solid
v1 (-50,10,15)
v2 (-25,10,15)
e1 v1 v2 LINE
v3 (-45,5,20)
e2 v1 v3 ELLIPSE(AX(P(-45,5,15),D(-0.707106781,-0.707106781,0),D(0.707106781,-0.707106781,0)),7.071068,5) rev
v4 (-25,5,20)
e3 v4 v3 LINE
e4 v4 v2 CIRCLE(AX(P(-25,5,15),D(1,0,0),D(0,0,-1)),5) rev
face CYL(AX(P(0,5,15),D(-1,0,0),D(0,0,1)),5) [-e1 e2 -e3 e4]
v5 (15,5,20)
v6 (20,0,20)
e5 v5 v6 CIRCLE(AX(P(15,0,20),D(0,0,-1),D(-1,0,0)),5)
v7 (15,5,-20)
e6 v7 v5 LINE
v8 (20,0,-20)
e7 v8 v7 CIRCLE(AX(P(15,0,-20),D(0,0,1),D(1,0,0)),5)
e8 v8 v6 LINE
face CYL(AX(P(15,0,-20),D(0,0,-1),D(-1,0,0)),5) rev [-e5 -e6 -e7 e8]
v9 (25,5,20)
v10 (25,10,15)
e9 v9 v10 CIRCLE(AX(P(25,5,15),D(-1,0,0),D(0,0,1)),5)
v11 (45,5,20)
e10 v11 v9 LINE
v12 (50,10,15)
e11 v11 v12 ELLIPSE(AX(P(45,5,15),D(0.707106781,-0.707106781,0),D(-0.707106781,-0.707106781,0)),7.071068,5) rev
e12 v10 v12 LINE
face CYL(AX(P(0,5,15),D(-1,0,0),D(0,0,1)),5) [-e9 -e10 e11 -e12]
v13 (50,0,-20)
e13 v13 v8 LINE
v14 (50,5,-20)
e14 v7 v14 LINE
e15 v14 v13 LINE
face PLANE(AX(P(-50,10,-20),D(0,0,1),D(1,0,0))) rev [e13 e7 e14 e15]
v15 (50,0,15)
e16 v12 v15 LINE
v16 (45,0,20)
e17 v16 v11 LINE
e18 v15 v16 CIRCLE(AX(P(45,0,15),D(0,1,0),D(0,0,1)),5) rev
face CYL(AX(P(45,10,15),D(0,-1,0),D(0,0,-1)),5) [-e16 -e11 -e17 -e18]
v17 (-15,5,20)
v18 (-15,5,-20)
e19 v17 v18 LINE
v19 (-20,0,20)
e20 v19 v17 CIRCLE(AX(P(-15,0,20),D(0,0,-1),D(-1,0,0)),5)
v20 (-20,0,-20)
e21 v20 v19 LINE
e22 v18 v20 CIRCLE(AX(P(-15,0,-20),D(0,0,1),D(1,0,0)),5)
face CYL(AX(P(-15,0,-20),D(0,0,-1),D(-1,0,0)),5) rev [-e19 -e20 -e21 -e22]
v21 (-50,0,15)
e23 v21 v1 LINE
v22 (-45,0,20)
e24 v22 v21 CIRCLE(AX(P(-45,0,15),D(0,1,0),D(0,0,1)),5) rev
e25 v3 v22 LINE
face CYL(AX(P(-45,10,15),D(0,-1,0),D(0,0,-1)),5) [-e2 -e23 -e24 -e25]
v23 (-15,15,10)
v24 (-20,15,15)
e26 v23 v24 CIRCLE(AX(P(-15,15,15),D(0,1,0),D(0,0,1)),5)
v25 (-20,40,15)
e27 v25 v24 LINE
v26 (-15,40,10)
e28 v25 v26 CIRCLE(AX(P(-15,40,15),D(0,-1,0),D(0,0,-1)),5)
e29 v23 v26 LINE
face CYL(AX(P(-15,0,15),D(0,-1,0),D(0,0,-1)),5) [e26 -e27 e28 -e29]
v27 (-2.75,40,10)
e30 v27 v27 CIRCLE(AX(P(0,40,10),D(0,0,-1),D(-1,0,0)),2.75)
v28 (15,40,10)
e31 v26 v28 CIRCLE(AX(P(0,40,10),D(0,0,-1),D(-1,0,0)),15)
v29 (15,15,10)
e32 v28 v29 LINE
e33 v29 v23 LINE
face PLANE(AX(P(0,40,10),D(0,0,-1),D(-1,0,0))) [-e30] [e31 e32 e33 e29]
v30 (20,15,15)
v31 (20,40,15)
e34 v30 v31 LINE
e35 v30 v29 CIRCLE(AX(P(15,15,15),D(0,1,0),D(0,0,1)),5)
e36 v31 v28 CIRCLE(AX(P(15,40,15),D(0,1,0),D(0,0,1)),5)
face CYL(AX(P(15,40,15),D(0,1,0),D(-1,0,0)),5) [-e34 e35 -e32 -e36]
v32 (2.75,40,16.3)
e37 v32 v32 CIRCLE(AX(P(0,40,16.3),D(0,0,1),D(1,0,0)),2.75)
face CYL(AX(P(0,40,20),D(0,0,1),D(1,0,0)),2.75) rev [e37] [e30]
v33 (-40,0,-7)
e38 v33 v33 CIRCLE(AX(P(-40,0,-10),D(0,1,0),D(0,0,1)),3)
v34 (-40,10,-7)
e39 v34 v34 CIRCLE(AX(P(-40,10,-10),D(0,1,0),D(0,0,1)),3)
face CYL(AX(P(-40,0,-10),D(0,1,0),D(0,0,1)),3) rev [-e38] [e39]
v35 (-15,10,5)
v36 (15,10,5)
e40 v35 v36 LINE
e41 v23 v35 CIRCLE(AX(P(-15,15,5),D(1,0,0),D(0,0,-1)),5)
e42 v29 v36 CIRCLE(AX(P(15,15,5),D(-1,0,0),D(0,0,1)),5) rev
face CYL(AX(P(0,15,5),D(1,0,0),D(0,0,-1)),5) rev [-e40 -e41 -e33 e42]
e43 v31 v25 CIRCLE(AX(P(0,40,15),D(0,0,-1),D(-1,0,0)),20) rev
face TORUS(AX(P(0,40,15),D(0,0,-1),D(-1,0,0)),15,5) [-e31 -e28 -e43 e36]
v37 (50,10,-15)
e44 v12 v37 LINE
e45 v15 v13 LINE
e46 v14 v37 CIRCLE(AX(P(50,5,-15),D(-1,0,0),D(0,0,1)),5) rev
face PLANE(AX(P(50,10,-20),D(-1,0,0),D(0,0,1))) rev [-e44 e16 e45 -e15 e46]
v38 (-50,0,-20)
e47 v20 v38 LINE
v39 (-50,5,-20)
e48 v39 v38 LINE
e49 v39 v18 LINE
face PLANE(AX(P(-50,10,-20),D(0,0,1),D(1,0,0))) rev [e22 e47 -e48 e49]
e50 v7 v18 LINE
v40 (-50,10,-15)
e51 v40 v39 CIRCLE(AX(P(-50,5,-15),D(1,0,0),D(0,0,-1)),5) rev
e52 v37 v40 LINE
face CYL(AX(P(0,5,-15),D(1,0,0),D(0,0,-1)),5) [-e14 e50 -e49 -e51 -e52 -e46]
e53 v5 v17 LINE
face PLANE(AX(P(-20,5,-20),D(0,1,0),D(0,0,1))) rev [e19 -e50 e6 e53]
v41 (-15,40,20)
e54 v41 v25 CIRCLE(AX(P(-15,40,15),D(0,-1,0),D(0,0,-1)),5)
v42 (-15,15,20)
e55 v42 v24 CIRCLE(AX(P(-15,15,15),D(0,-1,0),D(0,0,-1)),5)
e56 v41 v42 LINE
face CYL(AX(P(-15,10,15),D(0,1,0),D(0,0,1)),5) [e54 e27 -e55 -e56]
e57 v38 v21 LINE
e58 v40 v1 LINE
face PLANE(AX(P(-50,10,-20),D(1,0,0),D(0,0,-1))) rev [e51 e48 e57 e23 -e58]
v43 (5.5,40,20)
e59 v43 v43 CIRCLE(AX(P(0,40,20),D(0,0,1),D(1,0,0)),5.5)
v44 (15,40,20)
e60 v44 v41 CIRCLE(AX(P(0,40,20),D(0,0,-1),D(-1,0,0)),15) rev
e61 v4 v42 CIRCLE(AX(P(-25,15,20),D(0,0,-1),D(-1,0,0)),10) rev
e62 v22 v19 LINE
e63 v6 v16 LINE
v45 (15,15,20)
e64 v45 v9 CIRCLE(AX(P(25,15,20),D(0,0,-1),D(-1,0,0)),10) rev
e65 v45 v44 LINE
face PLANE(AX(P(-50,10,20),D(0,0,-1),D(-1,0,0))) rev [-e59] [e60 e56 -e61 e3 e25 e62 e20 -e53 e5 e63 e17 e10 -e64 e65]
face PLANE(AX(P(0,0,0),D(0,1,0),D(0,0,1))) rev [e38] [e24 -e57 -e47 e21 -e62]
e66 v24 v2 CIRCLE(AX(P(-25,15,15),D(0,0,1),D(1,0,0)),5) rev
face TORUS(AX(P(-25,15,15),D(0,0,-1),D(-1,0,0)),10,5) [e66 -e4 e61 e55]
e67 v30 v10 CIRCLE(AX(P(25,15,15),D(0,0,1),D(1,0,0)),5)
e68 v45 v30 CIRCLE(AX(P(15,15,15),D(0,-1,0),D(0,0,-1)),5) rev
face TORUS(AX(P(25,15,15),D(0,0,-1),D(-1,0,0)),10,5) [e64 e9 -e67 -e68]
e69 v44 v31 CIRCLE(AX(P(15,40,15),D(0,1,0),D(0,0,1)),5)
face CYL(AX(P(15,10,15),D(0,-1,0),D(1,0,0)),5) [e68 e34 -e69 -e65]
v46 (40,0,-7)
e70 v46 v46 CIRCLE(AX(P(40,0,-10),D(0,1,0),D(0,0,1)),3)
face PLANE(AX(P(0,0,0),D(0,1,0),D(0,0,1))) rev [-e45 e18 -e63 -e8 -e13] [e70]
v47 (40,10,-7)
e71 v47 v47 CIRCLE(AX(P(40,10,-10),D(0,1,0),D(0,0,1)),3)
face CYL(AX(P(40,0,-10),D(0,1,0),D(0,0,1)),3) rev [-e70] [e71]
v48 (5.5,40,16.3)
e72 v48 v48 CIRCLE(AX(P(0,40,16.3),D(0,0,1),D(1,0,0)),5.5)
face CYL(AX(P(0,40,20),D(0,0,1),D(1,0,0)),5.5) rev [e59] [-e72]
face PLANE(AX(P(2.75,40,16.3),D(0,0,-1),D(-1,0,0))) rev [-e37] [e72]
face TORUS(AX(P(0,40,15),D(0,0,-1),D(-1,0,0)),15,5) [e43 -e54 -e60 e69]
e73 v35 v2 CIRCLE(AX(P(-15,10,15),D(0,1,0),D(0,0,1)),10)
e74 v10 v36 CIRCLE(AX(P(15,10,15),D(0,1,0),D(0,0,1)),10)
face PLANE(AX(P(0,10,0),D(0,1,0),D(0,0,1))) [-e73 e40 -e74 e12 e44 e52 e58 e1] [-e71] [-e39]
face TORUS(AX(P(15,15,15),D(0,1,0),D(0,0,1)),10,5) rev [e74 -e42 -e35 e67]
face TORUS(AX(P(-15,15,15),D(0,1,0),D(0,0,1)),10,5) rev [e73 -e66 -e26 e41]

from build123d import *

# Parameters (mm, degrees)
ESBO_O1_W                                           = 100
ESBO_O1_H                                           = 40
RESSALTO_EXTRUS_O1_DEPTH                            = 10
RESSALTO_EXTRUS_O2_DEPTH                            = 10
ESBO_O3_R                                           = 3
CORTE_EXTRUS_O1_DEPTH                               = 74.484692283
REBAIXO_PARA_PARAFUSO_COM_CABE_A_PANELA_D           = 5.5
REBAIXO_PARA_PARAFUSO_COM_CABE_A_PANELA_CBORE_D     = 11
REBAIXO_PARA_PARAFUSO_COM_CABE_A_PANELA_CBORE_DEPTH = 3.7
ESBO_O6_W                                           = 40
ESBO_O6_H                                           = 5
CORTE_EXTRUS_O2_DEPTH                               = 88.749643874
FILETE1_R                                           = 5


with BuildPart() as part:
    # Esboço1 → Ressalto-extrusão1 (new body)
    with BuildSketch(Plane(origin=(0, 0, 0), x_dir=(1, 0, 0), z_dir=(0, 1, 0))):
        Rectangle(ESBO_O1_W, ESBO_O1_H)
    extrude(amount=RESSALTO_EXTRUS_O1_DEPTH)

    # Esboço2 → Ressalto-extrusão2 (add)
    with BuildSketch(Plane.XY.offset(20)):
        with BuildLine():
            Line((-20, 0), (-20, 40))
            ThreePointArc((-20, 40), (0, 60), (20, 40))
            Line((20, 40), (20, 0))
            Line((20, 0), (-20, 0))
        make_face()
    extrude(amount=-RESSALTO_EXTRUS_O2_DEPTH)

    # Esboço3 → Corte-extrusão1 (cut, through all)
    with BuildSketch(Plane(origin=(0, 10, 0), x_dir=(1, 0, 0), z_dir=(0, 1, 0))):
        with Locations(Location((-40, 10, 0), (0, 0, 270))):
            Circle(ESBO_O3_R)
        with Locations(Location((40, 10, 0), (0, 0, 270))):
            Circle(ESBO_O3_R)
    extrude(amount=-CORTE_EXTRUS_O1_DEPTH, mode=Mode.SUBTRACT)

    # Rebaixo para parafuso com cabeça panela de M51 (through all)
    with Locations(Plane(origin=(0, 40, 20), x_dir=(1, 0, 0), z_dir=(0, 0, 1))):
        with Locations((0, 0)):
            CounterBoreHole(REBAIXO_PARA_PARAFUSO_COM_CABE_A_PANELA_D / 2, REBAIXO_PARA_PARAFUSO_COM_CABE_A_PANELA_CBORE_D / 2, REBAIXO_PARA_PARAFUSO_COM_CABE_A_PANELA_CBORE_DEPTH)

    # Esboço6 → Corte-extrusão2 (cut, through all)
    with BuildSketch(Plane.XY.offset(20)):
        with Locations((0, 2.5)):
            Rectangle(ESBO_O6_W, ESBO_O6_H)
    extrude(amount=-CORTE_EXTRUS_O2_DEPTH, mode=Mode.SUBTRACT)

    # Filete1
    filete1_edges = [part.edges().sort_by_distance(p)[0] for p in [
        (-35, 10, 20),
        (35, 10, 20),
        (-20, 25, 10),
        (-20, 10, 15),
        (0, 60, 10),
        (20, 10, 15),
        (20, 25, 10),
        (0, 10, 10),
        (20, 25, 20),
        (0, 60, 20),
        (-20, 25, 20),
        (-20, 5, 0),
        (20, 5, 0),
        (0, 10, -20),
        (50, 5, 20),
        (-50, 5, 20),
    ]]
    fillet(filete1_edges, radius=FILETE1_R - 0.0001)  # a hair under: the kernel refuses the full size


solid = part.part
